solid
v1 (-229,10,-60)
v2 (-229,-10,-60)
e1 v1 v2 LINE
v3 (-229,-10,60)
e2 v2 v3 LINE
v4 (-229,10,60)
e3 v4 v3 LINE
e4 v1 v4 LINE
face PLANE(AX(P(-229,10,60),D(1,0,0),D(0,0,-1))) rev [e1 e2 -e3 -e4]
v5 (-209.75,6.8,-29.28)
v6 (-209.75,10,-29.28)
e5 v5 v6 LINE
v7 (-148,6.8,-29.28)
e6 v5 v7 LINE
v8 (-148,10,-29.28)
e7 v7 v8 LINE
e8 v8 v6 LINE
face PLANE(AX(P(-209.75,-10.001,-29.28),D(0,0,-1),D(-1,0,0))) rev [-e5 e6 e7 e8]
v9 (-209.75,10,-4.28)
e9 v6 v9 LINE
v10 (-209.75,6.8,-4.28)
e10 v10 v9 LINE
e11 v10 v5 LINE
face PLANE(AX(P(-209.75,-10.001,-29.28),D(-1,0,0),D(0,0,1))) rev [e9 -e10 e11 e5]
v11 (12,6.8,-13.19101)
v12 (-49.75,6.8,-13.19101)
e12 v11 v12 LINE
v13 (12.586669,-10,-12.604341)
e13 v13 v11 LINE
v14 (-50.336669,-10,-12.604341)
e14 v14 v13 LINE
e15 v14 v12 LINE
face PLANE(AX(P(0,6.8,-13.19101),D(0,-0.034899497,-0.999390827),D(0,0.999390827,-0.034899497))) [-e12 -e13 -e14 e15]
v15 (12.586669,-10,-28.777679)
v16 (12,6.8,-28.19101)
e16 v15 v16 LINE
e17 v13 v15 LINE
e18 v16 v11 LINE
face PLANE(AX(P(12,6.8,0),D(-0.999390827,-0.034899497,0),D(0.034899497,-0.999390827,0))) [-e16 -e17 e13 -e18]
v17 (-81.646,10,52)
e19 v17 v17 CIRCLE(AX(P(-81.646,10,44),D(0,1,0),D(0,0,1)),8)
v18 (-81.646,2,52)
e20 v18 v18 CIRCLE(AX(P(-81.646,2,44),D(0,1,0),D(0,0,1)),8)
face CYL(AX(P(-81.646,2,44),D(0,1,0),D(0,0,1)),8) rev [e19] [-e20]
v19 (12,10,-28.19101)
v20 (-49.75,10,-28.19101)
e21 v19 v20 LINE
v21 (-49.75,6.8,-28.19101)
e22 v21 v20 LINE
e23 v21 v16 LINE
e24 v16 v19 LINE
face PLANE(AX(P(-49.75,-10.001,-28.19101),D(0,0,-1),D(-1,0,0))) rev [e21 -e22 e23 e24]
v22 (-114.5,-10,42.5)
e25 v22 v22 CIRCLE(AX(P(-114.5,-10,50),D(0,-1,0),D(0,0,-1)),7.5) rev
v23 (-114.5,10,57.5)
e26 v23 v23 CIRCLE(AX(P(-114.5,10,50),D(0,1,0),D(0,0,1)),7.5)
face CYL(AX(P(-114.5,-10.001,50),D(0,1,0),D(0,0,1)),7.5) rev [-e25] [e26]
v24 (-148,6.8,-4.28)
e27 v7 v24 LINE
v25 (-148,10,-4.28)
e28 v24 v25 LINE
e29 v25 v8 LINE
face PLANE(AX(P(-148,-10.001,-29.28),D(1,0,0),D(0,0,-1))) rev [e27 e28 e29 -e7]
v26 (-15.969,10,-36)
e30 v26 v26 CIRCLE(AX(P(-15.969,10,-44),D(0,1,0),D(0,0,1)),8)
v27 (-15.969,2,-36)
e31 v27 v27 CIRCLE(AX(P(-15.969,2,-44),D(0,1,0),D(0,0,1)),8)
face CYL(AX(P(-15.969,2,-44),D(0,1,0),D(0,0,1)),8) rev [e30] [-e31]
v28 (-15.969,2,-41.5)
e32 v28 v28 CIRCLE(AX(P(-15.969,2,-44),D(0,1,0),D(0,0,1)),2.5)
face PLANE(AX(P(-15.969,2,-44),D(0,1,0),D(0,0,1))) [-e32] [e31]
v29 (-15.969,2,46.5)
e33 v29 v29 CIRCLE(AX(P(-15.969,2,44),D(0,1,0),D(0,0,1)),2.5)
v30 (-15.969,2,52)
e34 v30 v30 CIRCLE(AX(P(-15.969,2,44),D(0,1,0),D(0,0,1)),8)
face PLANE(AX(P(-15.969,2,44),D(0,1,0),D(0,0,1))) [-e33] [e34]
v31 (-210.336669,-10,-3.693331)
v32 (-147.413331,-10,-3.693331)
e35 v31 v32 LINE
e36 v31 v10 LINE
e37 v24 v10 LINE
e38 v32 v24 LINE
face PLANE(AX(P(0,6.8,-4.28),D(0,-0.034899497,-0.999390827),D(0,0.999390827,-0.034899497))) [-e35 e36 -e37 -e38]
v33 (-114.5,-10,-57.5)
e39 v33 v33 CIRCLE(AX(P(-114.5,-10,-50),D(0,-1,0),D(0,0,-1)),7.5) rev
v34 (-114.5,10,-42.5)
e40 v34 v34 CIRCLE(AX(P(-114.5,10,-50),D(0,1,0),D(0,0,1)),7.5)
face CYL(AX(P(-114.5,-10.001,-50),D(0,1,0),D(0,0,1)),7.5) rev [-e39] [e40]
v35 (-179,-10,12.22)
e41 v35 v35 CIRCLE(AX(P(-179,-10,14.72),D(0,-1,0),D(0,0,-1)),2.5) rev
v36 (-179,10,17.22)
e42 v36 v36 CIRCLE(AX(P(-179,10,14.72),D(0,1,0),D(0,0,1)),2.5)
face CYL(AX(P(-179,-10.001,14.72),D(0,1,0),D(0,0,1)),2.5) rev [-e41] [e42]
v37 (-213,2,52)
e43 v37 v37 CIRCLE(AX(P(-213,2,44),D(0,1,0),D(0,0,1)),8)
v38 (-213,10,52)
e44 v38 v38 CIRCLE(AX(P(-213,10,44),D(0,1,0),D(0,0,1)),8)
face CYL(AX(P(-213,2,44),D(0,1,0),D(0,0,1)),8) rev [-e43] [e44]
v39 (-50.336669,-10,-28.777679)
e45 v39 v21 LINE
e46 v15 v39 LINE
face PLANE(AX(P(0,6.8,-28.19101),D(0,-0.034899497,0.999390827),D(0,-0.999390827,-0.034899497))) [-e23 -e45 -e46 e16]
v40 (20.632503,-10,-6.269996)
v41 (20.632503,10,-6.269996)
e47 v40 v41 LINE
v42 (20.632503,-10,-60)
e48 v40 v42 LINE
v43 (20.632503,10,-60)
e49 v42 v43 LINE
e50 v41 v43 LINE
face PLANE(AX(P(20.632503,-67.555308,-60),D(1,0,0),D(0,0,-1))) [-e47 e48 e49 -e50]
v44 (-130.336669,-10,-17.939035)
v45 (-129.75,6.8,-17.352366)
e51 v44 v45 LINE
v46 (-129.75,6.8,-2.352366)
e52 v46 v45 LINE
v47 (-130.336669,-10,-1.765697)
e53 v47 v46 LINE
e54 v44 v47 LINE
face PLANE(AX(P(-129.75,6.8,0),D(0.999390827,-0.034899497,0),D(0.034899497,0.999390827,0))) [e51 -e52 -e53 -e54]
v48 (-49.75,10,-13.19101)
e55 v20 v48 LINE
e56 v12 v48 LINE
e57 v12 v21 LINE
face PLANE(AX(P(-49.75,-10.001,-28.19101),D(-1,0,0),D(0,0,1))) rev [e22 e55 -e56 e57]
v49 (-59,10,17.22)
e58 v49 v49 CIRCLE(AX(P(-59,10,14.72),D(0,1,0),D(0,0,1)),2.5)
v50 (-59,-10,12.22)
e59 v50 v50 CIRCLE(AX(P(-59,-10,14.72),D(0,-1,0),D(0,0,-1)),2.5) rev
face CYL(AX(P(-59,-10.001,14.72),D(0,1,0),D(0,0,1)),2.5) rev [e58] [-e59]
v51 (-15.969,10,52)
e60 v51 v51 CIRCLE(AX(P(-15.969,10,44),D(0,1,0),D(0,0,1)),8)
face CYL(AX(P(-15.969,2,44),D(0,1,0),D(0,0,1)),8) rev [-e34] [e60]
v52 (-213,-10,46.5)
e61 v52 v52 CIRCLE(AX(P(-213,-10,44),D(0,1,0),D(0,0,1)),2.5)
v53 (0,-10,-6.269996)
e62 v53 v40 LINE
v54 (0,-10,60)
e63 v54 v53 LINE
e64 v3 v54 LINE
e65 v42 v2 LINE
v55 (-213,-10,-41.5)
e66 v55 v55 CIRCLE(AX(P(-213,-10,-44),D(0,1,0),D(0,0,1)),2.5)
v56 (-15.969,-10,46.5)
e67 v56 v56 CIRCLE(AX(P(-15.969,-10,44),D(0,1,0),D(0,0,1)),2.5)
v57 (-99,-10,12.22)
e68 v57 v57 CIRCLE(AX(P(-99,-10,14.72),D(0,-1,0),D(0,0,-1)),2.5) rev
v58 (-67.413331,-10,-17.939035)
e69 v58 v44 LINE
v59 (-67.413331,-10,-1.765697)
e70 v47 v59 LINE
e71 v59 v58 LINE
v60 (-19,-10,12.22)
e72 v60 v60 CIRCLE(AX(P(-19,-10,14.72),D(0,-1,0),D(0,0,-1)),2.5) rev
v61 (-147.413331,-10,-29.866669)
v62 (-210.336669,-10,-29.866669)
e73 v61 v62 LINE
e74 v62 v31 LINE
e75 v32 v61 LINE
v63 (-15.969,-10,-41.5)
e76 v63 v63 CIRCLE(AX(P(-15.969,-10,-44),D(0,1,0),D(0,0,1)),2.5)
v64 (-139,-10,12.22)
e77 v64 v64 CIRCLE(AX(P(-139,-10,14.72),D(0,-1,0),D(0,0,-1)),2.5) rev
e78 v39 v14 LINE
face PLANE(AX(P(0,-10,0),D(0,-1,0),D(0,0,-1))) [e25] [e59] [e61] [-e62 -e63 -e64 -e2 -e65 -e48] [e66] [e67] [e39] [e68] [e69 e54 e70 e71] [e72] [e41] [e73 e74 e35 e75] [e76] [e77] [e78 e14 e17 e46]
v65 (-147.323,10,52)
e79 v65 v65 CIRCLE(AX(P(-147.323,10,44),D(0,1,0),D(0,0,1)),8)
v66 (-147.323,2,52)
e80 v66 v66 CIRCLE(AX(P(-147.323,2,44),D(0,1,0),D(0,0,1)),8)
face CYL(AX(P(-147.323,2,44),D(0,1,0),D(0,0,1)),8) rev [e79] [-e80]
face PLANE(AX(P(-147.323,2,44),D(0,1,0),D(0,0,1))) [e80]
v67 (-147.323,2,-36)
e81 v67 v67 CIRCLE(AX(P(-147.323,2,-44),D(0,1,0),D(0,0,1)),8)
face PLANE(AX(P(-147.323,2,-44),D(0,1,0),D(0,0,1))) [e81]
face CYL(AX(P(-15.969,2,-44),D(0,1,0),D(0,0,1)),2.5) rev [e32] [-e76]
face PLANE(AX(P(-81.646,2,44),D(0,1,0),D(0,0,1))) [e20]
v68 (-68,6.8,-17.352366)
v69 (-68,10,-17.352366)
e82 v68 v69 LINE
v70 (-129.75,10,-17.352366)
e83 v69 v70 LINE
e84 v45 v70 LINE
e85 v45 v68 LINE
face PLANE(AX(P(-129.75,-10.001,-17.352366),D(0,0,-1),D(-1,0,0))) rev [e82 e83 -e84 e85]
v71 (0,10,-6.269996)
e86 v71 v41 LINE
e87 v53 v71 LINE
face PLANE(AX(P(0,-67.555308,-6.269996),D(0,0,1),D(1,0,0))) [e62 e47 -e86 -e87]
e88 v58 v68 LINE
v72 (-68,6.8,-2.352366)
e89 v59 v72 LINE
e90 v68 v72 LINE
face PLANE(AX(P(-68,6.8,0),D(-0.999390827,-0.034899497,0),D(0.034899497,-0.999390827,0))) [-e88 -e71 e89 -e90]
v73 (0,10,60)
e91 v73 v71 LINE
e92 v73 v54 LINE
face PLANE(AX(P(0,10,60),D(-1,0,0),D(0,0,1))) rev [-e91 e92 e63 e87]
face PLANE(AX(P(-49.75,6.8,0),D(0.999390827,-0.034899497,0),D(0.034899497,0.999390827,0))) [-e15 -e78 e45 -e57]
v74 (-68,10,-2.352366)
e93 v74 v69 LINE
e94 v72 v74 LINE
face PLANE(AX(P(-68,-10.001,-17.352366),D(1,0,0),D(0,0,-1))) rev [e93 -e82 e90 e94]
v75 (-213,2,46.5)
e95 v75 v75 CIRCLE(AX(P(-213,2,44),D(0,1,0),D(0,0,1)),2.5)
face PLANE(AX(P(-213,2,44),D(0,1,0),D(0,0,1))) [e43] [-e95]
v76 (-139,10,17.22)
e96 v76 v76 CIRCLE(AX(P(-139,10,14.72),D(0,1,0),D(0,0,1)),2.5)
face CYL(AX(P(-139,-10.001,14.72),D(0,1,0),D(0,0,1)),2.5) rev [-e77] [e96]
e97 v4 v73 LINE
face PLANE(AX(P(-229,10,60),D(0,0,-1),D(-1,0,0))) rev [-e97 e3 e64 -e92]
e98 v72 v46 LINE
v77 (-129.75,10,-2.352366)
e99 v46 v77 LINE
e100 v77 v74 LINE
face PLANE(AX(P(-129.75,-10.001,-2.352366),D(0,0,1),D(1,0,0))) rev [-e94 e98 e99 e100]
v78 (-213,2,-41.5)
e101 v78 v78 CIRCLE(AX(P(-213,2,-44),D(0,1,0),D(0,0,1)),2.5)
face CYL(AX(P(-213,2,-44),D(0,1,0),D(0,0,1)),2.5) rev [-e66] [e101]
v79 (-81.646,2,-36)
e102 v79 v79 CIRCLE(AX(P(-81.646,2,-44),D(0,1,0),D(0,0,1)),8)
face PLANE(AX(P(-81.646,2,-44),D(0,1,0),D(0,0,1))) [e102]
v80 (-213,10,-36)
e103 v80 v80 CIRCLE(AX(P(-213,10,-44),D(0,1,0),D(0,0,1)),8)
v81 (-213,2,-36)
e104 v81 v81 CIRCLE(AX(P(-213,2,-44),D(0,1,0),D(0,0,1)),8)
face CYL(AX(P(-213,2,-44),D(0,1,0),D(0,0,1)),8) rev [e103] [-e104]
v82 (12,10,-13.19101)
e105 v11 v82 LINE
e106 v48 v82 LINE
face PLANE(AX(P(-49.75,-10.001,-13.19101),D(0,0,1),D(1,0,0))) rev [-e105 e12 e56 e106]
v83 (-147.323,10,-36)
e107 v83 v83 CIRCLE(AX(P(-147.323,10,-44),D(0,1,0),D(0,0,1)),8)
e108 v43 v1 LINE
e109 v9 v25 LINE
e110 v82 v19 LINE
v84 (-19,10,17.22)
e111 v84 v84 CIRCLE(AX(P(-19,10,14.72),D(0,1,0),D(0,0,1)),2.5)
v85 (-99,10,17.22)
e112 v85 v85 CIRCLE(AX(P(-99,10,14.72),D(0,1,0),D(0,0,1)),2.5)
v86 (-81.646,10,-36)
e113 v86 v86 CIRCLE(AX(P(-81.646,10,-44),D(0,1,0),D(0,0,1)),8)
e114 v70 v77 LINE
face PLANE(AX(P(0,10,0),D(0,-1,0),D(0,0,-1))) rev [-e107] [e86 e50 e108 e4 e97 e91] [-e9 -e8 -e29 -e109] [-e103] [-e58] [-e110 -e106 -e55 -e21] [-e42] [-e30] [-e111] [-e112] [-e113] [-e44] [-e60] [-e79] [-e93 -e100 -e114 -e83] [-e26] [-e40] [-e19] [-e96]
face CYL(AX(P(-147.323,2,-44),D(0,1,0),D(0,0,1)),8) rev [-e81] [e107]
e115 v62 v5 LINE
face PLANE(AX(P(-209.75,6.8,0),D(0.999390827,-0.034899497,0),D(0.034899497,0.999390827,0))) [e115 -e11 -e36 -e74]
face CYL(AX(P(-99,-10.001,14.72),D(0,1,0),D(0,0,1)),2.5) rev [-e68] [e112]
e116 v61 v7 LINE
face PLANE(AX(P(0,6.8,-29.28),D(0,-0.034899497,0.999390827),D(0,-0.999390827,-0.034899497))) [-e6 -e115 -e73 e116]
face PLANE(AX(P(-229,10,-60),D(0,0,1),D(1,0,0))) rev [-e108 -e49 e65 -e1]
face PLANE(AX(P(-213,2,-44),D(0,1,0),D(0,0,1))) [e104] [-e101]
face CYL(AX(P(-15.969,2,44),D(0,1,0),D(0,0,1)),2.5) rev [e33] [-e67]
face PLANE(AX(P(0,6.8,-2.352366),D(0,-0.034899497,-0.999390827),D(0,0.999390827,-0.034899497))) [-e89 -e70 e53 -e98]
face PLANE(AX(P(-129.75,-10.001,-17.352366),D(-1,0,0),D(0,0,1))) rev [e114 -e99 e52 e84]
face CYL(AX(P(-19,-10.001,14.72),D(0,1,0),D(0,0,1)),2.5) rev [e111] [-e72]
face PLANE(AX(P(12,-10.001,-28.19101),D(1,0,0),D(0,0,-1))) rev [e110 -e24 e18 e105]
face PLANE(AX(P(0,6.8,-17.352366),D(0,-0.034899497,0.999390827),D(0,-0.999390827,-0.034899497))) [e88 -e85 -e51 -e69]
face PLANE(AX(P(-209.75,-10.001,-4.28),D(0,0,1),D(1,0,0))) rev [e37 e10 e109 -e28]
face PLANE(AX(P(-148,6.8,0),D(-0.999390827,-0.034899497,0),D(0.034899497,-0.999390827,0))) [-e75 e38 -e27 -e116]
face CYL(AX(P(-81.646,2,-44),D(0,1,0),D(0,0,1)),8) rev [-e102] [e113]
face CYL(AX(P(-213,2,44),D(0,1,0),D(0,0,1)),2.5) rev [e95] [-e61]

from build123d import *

# Parameters (mm, degrees)
SKETCH1_W            = 229
SKETCH1_H            = 120
BOSS_EXTRUDE1_DEPTH  = 10
SKETCH4_W            = 20.632503002
SKETCH4_H            = 53.730004003
BOSS_EXTRUDE2_DEPTH  = 20
CUT_EXTRUDE1_REACH   = 239.573
SKETCH5_W            = 61.75
SKETCH5_H            = 15
SKETCH5_H_2          = 25
CUT_EXTRUDE2_REACH   = 239.573
SKETCH6_R            = 2.5
CUT_EXTRUDE3_REACH   = 239.573
SKETCH7_R            = 7.5
SKETCH8_R            = 8
CUT_EXTRUDE4_DEPTH   = 8
LPATTERN2_COUNT      = 4
LPATTERN2_PITCH      = 65.677
LPATTERN2_COUNT_DIR2 = 2
LPATTERN2_PITCH_DIR2 = 88
M6_TAPPED_HOLE2_D    = 5


with BuildPart() as part:
    # Sketch1 → Boss-Extrude1 (new, symmetric)
    with BuildSketch(Plane(origin=(0, 0, 0), x_dir=(1, 0, 0), z_dir=(0, 1, 0))):
        with Locations((-114.5, 0)):
            Rectangle(SKETCH1_W, SKETCH1_H)
    extrude(amount=BOSS_EXTRUDE1_DEPTH, both=True)

    # Sketch4 → Boss-Extrude2 (add)
    with BuildSketch(Plane(origin=(0, 10, 0), x_dir=(1, 0, 0), z_dir=(0, 1, 0))):
        with Locations((10.316251501, 33.134997999)):
            Rectangle(SKETCH4_W, SKETCH4_H)
    extrude(amount=-BOSS_EXTRUDE2_DEPTH)

    # Sketch5 → Cut-Extrude1 (cut, up to next)
    with BuildSketch(Plane(origin=(0, 10, 0), x_dir=(1, 0, 0), z_dir=(0, 1, 0)), mode=Mode.PRIVATE) as cut_extrude1_sk1:
        with Locations((-98.875, 9.852366083)):
            Rectangle(SKETCH5_W, SKETCH5_H)
    cut_extrude1_tool1 = extrude(cut_extrude1_sk1.sketch, amount=-CUT_EXTRUDE1_REACH, mode=Mode.PRIVATE) & part.part
    # Sketch5 → Cut-Extrude1 (cut, up to next)
    with BuildSketch(Plane(origin=(0, 10, 0), x_dir=(1, 0, 0), z_dir=(0, 1, 0)), mode=Mode.PRIVATE) as cut_extrude1_sk2:
        with Locations((-18.875, 20.69101)):
            Rectangle(SKETCH5_W, SKETCH5_H)
    cut_extrude1_tool2 = extrude(cut_extrude1_sk2.sketch, amount=-CUT_EXTRUDE1_REACH, mode=Mode.PRIVATE) & part.part
    # Sketch5 → Cut-Extrude1 (cut, up to next)
    with BuildSketch(Plane(origin=(0, 10, 0), x_dir=(1, 0, 0), z_dir=(0, 1, 0)), mode=Mode.PRIVATE) as cut_extrude1_sk3:
        with Locations((-178.875, 16.78)):
            Rectangle(SKETCH5_W, SKETCH5_H_2)
    cut_extrude1_tool3 = extrude(cut_extrude1_sk3.sketch, amount=-CUT_EXTRUDE1_REACH, mode=Mode.PRIVATE) & part.part
    add(cut_extrude1_tool1.solids().sort_by_distance((-98.875, 10, -9.852366))[0], mode=Mode.SUBTRACT)
    add(cut_extrude1_tool2.solids().sort_by_distance((-18.875, 10, -20.69101))[0], mode=Mode.SUBTRACT)
    add(cut_extrude1_tool3.solids().sort_by_distance((-178.875, 10, -16.78))[0], mode=Mode.SUBTRACT)

    # Sketch6 → Cut-Extrude2 (cut, up to next)
    with BuildSketch(Plane(origin=(0, 10, 0), x_dir=(1, 0, 0), z_dir=(0, 1, 0)), mode=Mode.PRIVATE) as cut_extrude2_sk1:
        with Locations(Location((-179, -14.72, 0), (0, 0, 270))):
            Circle(SKETCH6_R)
    cut_extrude2_tool1 = extrude(cut_extrude2_sk1.sketch, amount=-CUT_EXTRUDE2_REACH, mode=Mode.PRIVATE) & part.part
    # Sketch6 → Cut-Extrude2 (cut, up to next)
    with BuildSketch(Plane(origin=(0, 10, 0), x_dir=(1, 0, 0), z_dir=(0, 1, 0)), mode=Mode.PRIVATE) as cut_extrude2_sk2:
        with Locations(Location((-139, -14.72, 0), (0, 0, 270))):
            Circle(SKETCH6_R)
    cut_extrude2_tool2 = extrude(cut_extrude2_sk2.sketch, amount=-CUT_EXTRUDE2_REACH, mode=Mode.PRIVATE) & part.part
    # Sketch6 → Cut-Extrude2 (cut, up to next)
    with BuildSketch(Plane(origin=(0, 10, 0), x_dir=(1, 0, 0), z_dir=(0, 1, 0)), mode=Mode.PRIVATE) as cut_extrude2_sk3:
        with Locations(Location((-99, -14.72, 0), (0, 0, 270))):
            Circle(SKETCH6_R)
    cut_extrude2_tool3 = extrude(cut_extrude2_sk3.sketch, amount=-CUT_EXTRUDE2_REACH, mode=Mode.PRIVATE) & part.part
    # Sketch6 → Cut-Extrude2 (cut, up to next)
    with BuildSketch(Plane(origin=(0, 10, 0), x_dir=(1, 0, 0), z_dir=(0, 1, 0)), mode=Mode.PRIVATE) as cut_extrude2_sk4:
        with Locations(Location((-59, -14.72, 0), (0, 0, 270))):
            Circle(SKETCH6_R)
    cut_extrude2_tool4 = extrude(cut_extrude2_sk4.sketch, amount=-CUT_EXTRUDE2_REACH, mode=Mode.PRIVATE) & part.part
    # Sketch6 → Cut-Extrude2 (cut, up to next)
    with BuildSketch(Plane(origin=(0, 10, 0), x_dir=(1, 0, 0), z_dir=(0, 1, 0)), mode=Mode.PRIVATE) as cut_extrude2_sk5:
        with Locations(Location((-19, -14.72, 0), (0, 0, 270))):
            Circle(SKETCH6_R)
    cut_extrude2_tool5 = extrude(cut_extrude2_sk5.sketch, amount=-CUT_EXTRUDE2_REACH, mode=Mode.PRIVATE) & part.part
    add(cut_extrude2_tool1.solids().sort_by_distance((-179, 10, 14.72))[0], mode=Mode.SUBTRACT)
    add(cut_extrude2_tool2.solids().sort_by_distance((-139, 10, 14.72))[0], mode=Mode.SUBTRACT)
    add(cut_extrude2_tool3.solids().sort_by_distance((-99, 10, 14.72))[0], mode=Mode.SUBTRACT)
    add(cut_extrude2_tool4.solids().sort_by_distance((-59, 10, 14.72))[0], mode=Mode.SUBTRACT)
    add(cut_extrude2_tool5.solids().sort_by_distance((-19, 10, 14.72))[0], mode=Mode.SUBTRACT)

    # Sketch7 → Cut-Extrude3 (cut, up to next)
    with BuildSketch(Plane(origin=(0, 10, 0), x_dir=(1, 0, 0), z_dir=(0, 1, 0)), mode=Mode.PRIVATE) as cut_extrude3_sk1:
        with Locations(Location((-114.5, 50, 0), (0, 0, 270))):
            Circle(SKETCH7_R)
    cut_extrude3_tool1 = extrude(cut_extrude3_sk1.sketch, amount=-CUT_EXTRUDE3_REACH, mode=Mode.PRIVATE) & part.part
    # Sketch7 → Cut-Extrude3 (cut, up to next)
    with BuildSketch(Plane(origin=(0, 10, 0), x_dir=(1, 0, 0), z_dir=(0, 1, 0)), mode=Mode.PRIVATE) as cut_extrude3_sk2:
        with Locations(Location((-114.5, -50, 0), (0, 0, 270))):
            Circle(SKETCH7_R)
    cut_extrude3_tool2 = extrude(cut_extrude3_sk2.sketch, amount=-CUT_EXTRUDE3_REACH, mode=Mode.PRIVATE) & part.part
    add(cut_extrude3_tool1.solids().sort_by_distance((-114.5, 10, -50))[0], mode=Mode.SUBTRACT)
    add(cut_extrude3_tool2.solids().sort_by_distance((-114.5, 10, 50))[0], mode=Mode.SUBTRACT)

    # Draft1: read off the stored shape, not the designer's step
    # Draft1: loft between two sections, ruled curve by curve
    draft1_from = [
        Edge.make_line((-129.75, 6.8, -17.352366083), (-129.75, 6.8, -2.352366083)),
        Edge.make_line((-68, 6.8, -17.352366083), (-129.75, 6.8, -17.352366083)),
        Edge.make_line((-68, 6.8, -2.352366083), (-68, 6.8, -17.352366083)),
        Edge.make_line((-129.75, 6.8, -2.352366083), (-68, 6.8, -2.352366083)),
    ]
    draft1_to = [
        Edge.make_line((-130.336668927, -10, -17.93903501), (-130.336668927, -10, -1.765697156)),
        Edge.make_line((-67.413331073, -10, -17.93903501), (-130.336668927, -10, -17.93903501)),
        Edge.make_line((-67.413331073, -10, -1.765697156), (-67.413331073, -10, -17.93903501)),
        Edge.make_line((-130.336668927, -10, -1.765697156), (-67.413331073, -10, -1.765697156)),
    ]
    draft1 = Solid(Shell([*[Face.make_surface_from_curves(draft1_from[k], draft1_to[k]) for k in range(4)], Face(Wire(draft1_from)), Face(Wire(draft1_to))]))
    add(draft1, mode=Mode.SUBTRACT)

    # Draft1 2: loft between two sections, ruled curve by curve
    draft1_2_from = [
        Edge.make_line((-49.75, 6.8, -28.19101), (-49.75, 6.8, -13.19101)),
        Edge.make_line((12, 6.8, -28.19101), (-49.75, 6.8, -28.19101)),
        Edge.make_line((12, 6.8, -13.19101), (12, 6.8, -28.19101)),
        Edge.make_line((-49.75, 6.8, -13.19101), (12, 6.8, -13.19101)),
    ]
    draft1_2_to = [
        Edge.make_line((-50.336668927, -10, -28.777678927), (-50.336668927, -10, -12.604341073)),
        Edge.make_line((12.586668927, -10, -28.777678927), (-50.336668927, -10, -28.777678927)),
        Edge.make_line((12.586668927, -10, -12.604341073), (12.586668927, -10, -28.777678927)),
        Edge.make_line((-50.336668927, -10, -12.604341073), (12.586668927, -10, -12.604341073)),
    ]
    draft1_2 = Solid(Shell([*[Face.make_surface_from_curves(draft1_2_from[k], draft1_2_to[k]) for k in range(4)], Face(Wire(draft1_2_from)), Face(Wire(draft1_2_to))]))
    add(draft1_2, mode=Mode.SUBTRACT)

    # Draft1 3: loft between two sections, ruled curve by curve
    draft1_3_from = [
        Edge.make_line((-209.75, 6.8, -29.28), (-209.75, 6.8, -4.28)),
        Edge.make_line((-148, 6.8, -29.28), (-209.75, 6.8, -29.28)),
        Edge.make_line((-148, 6.8, -4.28), (-148, 6.8, -29.28)),
        Edge.make_line((-209.75, 6.8, -4.28), (-148, 6.8, -4.28)),
    ]
    draft1_3_to = [
        Edge.make_line((-210.336668927, -10, -29.866668927), (-210.336668927, -10, -3.693331073)),
        Edge.make_line((-147.413331073, -10, -29.866668927), (-210.336668927, -10, -29.866668927)),
        Edge.make_line((-147.413331073, -10, -3.693331073), (-147.413331073, -10, -29.866668927)),
        Edge.make_line((-210.336668927, -10, -3.693331073), (-147.413331073, -10, -3.693331073)),
    ]
    draft1_3 = Solid(Shell([*[Face.make_surface_from_curves(draft1_3_from[k], draft1_3_to[k]) for k in range(4)], Face(Wire(draft1_3_from)), Face(Wire(draft1_3_to))]))
    add(draft1_3, mode=Mode.SUBTRACT)

    # Sketch8 → Cut-Extrude4 (cut)
    with BuildSketch(Plane(origin=(0, 10, 0), x_dir=(1, 0, 0), z_dir=(0, 1, 0))):
        with Locations(Location((-213, 44, 0), (0, 0, 270))):
            Circle(SKETCH8_R)
    cut_extrude4 = extrude(amount=-CUT_EXTRUDE4_DEPTH, mode=Mode.SUBTRACT)

    # LPattern2: Cut-Extrude4 4 × 2
    with Locations(*[(i * LPATTERN2_PITCH, 0, j * LPATTERN2_PITCH_DIR2) for i in range(LPATTERN2_COUNT) for j in range(LPATTERN2_COUNT_DIR2) if (i, j) != (0, 0)]):
        add(cut_extrude4, mode=Mode.SUBTRACT)

    # M6 Tapped Hole2 (through all)
    with Locations(Plane(origin=(0, 2, 0), x_dir=(1, 0, 0), z_dir=(0, 1, 0))):
        with Locations((-213, 44), (-15.969, 44), (-15.969, -44), (-213, -44)):
            Hole(M6_TAPPED_HOLE2_D / 2)


solid = part.part
